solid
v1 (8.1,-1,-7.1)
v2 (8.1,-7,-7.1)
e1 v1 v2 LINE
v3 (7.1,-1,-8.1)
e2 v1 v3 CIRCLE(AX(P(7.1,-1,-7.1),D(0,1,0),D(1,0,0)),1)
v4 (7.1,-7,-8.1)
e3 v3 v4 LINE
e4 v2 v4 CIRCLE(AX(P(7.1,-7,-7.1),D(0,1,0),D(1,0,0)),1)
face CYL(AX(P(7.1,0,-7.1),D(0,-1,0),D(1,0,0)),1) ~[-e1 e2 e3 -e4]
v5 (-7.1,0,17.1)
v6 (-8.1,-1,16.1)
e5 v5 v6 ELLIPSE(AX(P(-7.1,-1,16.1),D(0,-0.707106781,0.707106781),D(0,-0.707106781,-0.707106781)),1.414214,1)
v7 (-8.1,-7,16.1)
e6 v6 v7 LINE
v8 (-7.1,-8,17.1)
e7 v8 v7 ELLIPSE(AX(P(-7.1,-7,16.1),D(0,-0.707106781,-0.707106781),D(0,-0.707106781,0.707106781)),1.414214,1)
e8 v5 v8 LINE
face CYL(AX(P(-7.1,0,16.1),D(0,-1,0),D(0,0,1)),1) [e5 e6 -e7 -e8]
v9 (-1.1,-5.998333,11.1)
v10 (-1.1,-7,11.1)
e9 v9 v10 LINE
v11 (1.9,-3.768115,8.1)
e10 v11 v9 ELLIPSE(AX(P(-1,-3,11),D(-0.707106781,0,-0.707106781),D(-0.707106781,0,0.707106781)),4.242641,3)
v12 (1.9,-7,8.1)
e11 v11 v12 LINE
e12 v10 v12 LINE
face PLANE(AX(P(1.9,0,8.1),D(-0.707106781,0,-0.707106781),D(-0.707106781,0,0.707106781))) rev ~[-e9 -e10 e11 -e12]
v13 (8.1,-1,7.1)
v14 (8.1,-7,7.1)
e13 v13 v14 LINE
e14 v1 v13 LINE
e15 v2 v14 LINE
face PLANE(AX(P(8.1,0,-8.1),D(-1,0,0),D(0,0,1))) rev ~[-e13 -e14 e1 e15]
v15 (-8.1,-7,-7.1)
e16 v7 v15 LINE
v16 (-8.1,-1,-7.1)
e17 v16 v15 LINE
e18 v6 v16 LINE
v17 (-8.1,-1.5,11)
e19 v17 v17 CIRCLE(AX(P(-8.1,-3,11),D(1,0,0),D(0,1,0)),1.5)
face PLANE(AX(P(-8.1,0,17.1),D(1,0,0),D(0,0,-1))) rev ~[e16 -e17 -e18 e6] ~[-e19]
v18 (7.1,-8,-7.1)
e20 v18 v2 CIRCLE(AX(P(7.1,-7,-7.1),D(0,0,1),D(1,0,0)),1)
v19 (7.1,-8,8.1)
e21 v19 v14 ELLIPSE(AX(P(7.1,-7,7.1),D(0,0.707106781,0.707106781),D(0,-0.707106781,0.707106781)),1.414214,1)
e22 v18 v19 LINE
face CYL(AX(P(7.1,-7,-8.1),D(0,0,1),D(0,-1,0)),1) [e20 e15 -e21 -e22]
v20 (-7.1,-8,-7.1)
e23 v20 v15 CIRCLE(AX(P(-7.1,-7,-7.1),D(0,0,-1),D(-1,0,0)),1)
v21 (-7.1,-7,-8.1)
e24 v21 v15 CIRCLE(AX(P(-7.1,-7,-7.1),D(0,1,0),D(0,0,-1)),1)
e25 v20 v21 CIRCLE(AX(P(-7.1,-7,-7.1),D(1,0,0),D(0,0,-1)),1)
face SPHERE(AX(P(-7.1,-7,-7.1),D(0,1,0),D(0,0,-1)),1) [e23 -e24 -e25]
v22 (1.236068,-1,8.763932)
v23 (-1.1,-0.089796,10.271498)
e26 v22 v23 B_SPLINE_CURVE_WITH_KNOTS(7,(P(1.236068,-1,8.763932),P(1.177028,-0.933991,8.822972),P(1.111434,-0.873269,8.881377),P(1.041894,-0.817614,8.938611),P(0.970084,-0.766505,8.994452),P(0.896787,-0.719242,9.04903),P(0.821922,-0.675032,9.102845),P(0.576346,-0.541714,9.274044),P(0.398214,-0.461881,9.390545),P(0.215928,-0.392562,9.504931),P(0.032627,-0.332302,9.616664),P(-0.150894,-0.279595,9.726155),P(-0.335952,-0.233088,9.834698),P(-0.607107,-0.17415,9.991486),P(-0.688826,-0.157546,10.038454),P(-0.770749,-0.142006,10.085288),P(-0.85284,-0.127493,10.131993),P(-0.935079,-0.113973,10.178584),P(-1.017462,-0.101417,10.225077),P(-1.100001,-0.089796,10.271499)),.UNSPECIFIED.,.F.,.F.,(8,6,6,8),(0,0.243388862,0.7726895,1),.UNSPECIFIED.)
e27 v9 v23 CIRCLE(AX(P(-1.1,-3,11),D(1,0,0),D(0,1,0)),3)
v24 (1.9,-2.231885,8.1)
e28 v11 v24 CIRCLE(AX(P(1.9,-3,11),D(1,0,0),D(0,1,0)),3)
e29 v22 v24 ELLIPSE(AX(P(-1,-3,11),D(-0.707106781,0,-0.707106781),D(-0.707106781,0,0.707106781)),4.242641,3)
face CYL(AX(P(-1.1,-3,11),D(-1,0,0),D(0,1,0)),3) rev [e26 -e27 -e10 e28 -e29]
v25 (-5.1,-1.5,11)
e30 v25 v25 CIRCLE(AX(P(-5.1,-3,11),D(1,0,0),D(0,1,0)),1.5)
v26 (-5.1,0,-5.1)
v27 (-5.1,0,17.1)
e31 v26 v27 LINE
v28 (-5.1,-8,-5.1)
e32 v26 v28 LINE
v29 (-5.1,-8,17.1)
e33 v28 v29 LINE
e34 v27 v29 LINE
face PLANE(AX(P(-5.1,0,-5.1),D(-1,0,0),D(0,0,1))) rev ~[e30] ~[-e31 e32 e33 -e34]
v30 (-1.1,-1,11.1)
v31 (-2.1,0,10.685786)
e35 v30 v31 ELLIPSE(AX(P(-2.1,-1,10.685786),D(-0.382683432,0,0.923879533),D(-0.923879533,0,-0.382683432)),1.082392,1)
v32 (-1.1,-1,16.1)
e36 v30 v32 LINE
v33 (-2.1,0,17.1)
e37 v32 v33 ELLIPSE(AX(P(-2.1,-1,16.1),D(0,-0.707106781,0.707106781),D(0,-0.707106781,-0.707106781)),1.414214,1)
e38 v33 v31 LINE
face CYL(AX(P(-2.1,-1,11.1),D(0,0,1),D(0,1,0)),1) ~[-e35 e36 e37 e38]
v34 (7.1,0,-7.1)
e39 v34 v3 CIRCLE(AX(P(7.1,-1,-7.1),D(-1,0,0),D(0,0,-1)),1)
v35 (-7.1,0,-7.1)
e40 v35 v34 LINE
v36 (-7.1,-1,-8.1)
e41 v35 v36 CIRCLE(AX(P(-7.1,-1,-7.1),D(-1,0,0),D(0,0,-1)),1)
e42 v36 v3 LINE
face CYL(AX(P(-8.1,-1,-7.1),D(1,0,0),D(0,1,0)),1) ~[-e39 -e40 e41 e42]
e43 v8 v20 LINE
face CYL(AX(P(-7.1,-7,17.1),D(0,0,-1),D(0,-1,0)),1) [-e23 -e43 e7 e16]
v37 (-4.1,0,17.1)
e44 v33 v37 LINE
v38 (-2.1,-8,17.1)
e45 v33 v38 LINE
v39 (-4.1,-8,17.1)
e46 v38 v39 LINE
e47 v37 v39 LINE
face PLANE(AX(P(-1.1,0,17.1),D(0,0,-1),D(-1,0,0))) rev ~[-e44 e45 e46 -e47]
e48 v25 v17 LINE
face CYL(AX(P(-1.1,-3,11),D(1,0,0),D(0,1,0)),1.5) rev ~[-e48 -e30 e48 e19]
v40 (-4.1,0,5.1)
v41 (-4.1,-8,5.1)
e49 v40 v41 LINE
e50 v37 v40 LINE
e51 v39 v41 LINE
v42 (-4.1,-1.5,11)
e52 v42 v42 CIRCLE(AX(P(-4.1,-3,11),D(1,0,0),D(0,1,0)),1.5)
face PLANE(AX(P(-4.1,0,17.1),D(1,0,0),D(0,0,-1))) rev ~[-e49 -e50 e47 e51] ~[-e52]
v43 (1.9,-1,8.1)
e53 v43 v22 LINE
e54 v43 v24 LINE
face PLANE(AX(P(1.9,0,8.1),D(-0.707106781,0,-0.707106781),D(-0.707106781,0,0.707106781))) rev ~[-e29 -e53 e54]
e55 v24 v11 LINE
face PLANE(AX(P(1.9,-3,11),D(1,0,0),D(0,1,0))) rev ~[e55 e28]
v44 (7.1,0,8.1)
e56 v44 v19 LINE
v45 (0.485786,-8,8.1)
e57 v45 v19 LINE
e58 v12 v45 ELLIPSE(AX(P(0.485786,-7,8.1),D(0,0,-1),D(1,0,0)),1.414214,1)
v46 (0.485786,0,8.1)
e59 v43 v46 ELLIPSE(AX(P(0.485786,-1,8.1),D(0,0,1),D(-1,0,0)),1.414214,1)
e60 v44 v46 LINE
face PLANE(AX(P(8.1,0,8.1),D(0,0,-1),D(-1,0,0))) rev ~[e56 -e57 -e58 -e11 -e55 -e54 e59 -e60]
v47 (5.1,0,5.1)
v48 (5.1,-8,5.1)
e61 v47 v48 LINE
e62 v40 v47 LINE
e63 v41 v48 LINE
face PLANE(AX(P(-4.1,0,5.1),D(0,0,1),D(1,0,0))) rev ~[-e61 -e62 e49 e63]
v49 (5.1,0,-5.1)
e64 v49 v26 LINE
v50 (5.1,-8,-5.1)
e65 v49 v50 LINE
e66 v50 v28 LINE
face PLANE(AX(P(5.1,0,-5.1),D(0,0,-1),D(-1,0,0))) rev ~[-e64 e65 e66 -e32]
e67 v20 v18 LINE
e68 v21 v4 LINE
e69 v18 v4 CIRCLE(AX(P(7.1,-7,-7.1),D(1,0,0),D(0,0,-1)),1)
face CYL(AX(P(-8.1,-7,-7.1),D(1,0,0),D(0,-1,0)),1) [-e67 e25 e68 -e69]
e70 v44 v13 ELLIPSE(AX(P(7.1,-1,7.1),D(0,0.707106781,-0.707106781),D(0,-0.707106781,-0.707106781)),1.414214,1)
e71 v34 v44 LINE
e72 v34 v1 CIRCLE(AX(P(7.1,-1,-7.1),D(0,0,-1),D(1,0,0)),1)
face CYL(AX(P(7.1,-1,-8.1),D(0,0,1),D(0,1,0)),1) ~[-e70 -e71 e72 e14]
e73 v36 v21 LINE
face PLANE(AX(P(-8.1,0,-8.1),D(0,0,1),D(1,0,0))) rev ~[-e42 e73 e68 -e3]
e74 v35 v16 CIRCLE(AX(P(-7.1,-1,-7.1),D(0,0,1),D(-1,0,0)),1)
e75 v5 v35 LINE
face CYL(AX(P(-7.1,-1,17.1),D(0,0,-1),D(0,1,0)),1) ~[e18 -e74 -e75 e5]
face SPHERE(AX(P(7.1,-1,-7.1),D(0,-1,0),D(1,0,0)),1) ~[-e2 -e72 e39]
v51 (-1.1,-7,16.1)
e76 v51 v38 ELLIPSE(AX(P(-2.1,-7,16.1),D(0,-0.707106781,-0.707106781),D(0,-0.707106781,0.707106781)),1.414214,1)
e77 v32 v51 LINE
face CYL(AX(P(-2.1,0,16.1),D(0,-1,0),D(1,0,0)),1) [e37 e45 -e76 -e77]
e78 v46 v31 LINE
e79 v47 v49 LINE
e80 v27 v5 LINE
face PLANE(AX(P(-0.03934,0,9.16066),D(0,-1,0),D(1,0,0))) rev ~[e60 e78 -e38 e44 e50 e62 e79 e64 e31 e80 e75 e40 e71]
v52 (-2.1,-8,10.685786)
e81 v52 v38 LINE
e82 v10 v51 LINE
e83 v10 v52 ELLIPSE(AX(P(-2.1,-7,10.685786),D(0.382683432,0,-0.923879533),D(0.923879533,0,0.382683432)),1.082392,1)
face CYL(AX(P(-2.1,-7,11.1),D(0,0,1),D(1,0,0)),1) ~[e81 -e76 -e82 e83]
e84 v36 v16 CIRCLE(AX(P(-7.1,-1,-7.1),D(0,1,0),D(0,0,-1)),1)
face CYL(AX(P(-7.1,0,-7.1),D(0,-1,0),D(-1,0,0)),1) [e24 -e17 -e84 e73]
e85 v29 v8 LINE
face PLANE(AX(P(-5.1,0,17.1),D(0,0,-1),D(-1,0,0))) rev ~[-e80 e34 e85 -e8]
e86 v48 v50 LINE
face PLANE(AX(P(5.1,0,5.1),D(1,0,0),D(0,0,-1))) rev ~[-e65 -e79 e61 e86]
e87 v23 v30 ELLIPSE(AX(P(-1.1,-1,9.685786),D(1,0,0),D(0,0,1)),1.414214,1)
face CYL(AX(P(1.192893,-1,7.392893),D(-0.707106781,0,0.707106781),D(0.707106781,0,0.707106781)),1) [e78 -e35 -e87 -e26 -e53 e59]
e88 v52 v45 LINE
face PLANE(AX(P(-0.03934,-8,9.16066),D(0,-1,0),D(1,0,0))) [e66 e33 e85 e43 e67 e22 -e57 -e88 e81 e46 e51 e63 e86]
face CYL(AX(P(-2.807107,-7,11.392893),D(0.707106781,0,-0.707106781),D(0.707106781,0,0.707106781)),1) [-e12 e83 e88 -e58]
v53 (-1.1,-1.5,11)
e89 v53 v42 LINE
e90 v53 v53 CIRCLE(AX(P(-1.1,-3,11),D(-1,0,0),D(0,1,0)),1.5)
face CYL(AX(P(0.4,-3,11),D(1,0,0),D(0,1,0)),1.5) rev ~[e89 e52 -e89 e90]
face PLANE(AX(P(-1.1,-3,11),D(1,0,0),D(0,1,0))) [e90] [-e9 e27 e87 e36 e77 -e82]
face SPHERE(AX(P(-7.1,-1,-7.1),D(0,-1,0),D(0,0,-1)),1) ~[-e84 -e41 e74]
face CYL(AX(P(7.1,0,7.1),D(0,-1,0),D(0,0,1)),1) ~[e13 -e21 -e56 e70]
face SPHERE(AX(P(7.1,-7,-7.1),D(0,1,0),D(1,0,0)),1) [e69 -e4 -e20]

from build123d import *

# Parameters (mm, degrees)
F1_DEPTH    = 8
F2_R        = 1.5
F3_DEPTH    = 7.001
F4_T4_DEPTH = 8
F4_S5_R     = 1.5
F4_T6_DEPTH = 6
F5_R        = 1
F6_R        = 1
F7_R        = 3
F8_DEPTH    = 3


# Not quite as in the source:
# - a fillet or chamfer that OpenCascade refuses, or shapes differently, is made with other operations: its cross-section is extruded or revolved along the edge and cut away or added


with BuildPart() as f1:
    # F0 (on Front) → F1 (new body)
    with BuildSketch(Plane.XZ):
        Polygon((5.1, 5.1), (5.1, -5.1), (-5.1, -5.1), (-5.1, 5.1), (-5.1, 8.1), (-5.1, 17.1), (-8.1, 17.1), (-8.1, 8.1), (-8.1, -8.1), (8.1, -8.1), (8.1, 8.1), (-1.1, 8.1), (-1.1, 17.1), (-4.1, 17.1), (-4.1, 8.1), (-4.1, 5.1), align=None)
    extrude(amount=F1_DEPTH)

    # F2 (on face) → F3 (cut, through all)
    with BuildSketch(Plane.YZ.offset(-1.1)):
        with Locations((-3, 11)):
            Circle(F2_R)
    extrude(amount=-F3_DEPTH, mode=Mode.SUBTRACT)

    # F4: chamfer of 3 on 1 edges, made by hand


with BuildPart() as f4_tool2:
    # F4_s3 → F4_t4 (new body)
    with BuildSketch(Plane.XZ):
        Polygon((1.9, 8.1), (-1.1, 11.1), (-1.1, 8.1), align=None)
    extrude(amount=F4_T4_DEPTH)

    # F4_s5 → F4_t6 (cut, symmetric)
    with BuildSketch(Plane.YZ.offset(0.4)):
        with Locations((-3, 11)):
            Circle(F4_S5_R)
    extrude(amount=F4_T6_DEPTH, both=True, mode=Mode.SUBTRACT)


with BuildPart() as f1_1:
    add(f1.part)

    # F4_t1: union F4_tool2
    add(f4_tool2.part)

    # F5
    f5_edges = [f1_1.edges().sort_by_distance(p)[0] for p in [
        (8.1, -4, -8.1),
        (8.1, -4, 8.1),
        (8.1, 0, 0),
        (8.1, -8, 0),
        (-8.1, -4, -8.1),
        (0, 0, -8.1),
        (0, -8, -8.1),
        (-8.1, -4, 17.1),
        (-8.1, 0, 4.5),
        (-8.1, -8, 4.5),
        (-1.1, -4, 17.1),
        (-1.1, 0, 14.1),
        (-1.1, -8, 14.1),
    ]]
    fillet(f5_edges, radius=F5_R)

    # F6
    f6_edges = [f1_1.edges().sort_by_distance(p)[0] for p in [
        (0.4, 0, 9.6),
        (0.4, -8, 9.6),
    ]]
    fillet(f6_edges, radius=F6_R)

    # F7 (on face) → F8 (cut)
    with BuildSketch(Plane.YZ.offset(-1.1)):
        with Locations((-3, 11)):
            Circle(F7_R)
    extrude(amount=F8_DEPTH, mode=Mode.SUBTRACT)


solid = f1_1.part
